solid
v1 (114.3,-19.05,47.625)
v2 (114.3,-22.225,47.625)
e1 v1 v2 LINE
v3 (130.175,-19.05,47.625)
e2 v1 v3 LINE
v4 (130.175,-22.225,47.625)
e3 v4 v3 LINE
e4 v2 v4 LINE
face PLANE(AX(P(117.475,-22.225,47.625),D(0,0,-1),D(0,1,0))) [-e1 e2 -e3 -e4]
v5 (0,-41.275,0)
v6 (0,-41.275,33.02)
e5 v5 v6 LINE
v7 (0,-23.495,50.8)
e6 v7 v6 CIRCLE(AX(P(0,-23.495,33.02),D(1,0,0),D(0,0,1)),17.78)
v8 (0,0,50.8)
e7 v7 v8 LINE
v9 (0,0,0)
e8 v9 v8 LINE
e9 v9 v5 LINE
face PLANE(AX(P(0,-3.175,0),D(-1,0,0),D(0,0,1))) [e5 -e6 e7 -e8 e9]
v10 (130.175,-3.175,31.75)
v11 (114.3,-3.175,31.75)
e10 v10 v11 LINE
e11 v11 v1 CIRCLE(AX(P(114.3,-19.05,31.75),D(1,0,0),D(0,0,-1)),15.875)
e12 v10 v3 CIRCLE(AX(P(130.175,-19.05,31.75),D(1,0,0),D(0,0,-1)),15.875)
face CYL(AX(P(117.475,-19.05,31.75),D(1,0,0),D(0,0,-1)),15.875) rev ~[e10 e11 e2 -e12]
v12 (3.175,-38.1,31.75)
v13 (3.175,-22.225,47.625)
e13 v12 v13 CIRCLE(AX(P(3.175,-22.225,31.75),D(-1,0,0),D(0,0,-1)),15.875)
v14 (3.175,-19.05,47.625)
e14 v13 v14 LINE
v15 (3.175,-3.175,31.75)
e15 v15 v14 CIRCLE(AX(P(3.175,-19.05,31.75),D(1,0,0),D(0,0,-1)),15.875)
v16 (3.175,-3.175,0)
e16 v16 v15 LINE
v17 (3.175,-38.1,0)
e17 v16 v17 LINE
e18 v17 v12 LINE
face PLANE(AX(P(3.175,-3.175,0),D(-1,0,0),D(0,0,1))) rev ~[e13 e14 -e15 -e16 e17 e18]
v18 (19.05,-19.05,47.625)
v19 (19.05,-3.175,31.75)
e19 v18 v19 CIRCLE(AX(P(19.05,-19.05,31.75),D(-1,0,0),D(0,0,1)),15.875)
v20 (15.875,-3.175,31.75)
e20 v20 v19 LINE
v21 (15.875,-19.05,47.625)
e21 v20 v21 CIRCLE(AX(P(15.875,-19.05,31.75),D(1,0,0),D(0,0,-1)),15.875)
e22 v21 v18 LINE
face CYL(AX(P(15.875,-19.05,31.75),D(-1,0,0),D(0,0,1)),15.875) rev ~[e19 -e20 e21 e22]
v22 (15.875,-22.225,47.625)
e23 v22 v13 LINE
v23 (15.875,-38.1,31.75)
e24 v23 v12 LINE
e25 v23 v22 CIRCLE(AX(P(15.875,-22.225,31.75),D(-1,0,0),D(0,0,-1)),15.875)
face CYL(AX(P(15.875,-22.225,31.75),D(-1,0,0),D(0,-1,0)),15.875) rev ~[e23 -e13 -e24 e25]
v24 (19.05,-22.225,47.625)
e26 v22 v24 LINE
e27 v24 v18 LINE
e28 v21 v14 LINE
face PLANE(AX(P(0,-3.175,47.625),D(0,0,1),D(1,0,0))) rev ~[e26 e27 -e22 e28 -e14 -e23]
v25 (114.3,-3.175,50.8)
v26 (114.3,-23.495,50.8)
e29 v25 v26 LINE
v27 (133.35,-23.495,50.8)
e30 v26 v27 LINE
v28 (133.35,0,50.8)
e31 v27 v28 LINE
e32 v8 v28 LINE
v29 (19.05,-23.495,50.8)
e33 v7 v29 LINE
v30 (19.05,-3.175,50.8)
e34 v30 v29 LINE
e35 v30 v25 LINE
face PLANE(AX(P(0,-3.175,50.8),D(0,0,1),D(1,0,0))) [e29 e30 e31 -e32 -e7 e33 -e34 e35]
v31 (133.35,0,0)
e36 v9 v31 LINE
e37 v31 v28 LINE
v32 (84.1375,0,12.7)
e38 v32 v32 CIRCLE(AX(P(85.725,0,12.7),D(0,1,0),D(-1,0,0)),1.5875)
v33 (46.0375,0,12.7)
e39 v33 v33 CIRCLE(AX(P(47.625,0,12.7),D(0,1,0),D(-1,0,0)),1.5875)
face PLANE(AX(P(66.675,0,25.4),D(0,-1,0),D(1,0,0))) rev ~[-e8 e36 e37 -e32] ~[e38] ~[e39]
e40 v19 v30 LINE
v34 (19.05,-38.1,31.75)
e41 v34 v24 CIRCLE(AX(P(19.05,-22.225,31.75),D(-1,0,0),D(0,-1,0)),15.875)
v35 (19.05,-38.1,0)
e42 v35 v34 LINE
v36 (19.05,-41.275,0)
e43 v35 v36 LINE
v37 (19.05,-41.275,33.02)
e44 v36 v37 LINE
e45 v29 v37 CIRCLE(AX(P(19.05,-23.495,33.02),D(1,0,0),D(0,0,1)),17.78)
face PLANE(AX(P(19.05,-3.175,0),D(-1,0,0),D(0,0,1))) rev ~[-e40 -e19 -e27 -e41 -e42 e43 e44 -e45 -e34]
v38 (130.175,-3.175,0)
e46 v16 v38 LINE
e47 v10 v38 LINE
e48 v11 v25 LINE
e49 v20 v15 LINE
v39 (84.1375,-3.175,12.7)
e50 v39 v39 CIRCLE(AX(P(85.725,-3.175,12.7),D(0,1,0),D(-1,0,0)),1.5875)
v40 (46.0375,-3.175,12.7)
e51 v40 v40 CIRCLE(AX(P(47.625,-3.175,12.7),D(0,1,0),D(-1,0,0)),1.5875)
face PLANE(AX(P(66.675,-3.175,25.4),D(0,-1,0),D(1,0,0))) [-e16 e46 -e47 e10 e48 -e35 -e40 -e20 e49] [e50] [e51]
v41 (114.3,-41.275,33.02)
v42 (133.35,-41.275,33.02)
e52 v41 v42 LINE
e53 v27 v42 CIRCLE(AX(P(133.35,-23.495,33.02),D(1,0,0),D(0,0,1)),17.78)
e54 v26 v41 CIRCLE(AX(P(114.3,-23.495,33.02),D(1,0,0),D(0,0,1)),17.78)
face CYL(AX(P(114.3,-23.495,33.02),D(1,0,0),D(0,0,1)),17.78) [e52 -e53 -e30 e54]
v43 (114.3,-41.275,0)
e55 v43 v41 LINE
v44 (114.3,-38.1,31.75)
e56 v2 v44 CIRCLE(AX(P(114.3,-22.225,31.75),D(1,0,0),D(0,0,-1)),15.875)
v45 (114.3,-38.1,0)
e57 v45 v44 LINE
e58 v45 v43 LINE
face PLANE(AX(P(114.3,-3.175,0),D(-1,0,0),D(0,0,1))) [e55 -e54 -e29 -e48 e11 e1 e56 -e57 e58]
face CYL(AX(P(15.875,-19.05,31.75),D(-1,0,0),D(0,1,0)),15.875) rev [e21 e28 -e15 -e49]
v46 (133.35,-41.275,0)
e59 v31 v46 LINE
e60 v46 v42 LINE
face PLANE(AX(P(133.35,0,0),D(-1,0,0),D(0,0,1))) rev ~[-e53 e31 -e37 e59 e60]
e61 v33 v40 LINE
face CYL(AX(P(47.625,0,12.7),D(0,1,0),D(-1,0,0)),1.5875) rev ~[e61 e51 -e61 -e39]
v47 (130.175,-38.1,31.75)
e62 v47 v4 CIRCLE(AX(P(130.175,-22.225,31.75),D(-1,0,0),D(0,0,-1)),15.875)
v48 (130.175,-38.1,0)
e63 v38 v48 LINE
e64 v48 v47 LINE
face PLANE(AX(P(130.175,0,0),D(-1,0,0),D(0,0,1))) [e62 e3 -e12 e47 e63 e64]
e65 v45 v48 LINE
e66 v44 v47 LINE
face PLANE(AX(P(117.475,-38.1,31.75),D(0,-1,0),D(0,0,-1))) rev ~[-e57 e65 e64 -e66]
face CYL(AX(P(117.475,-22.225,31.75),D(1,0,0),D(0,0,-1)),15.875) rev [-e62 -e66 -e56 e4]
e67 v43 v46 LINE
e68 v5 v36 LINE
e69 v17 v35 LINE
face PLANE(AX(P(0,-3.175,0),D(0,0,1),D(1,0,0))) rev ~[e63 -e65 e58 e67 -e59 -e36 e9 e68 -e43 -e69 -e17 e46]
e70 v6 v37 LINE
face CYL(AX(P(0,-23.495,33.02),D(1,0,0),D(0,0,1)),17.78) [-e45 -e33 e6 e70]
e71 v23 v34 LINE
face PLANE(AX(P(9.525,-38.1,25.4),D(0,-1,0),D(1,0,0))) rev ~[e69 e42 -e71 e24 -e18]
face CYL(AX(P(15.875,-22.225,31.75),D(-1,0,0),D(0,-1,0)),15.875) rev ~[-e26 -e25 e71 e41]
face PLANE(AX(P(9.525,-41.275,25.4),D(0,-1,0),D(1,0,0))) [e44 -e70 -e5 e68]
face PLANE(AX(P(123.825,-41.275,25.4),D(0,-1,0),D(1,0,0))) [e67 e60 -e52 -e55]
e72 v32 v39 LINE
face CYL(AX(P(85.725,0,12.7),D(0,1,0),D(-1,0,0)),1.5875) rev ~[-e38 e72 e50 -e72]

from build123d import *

# Parameters (mm, degrees)
F0_W        = 133.35
F0_H        = 50.8
F1_DEPTH    = 3.175
F2_W        = 19.05
F2_H        = 50.8
F3_DEPTH    = 38.1
F4_T        = 3.175
F4_T3_DEPTH = 57.15
F5_R        = 15.875
F7_DEPTH    = 25.4
F8_DEPTH    = 25.4
F9_R        = 1.5875
F10_DEPTH   = 25.4
F11_R       = 17.78


# Not quite as in the source:
# - a shell that OpenCascade refuses in one call is made with other operations: the cavity is built on its own and cut out


with BuildPart() as f1:
    # F0 (on Front) → F1 (new body)
    with BuildSketch(Plane.XZ):
        with Locations((66.675, 25.4)):
            Rectangle(F0_W, F0_H)
    extrude(amount=F1_DEPTH)

    # F2 (on face) → F3 (join)
    with BuildSketch(Plane.XZ.offset(3.175)):
        with Locations((9.525, 25.4)):
            Rectangle(F2_W, F2_H)
        with Locations((123.825, 25.4)):
            Rectangle(F2_W, F2_H)
    extrude(amount=F3_DEPTH)

    # F4: shell of thickness 3.175, made by hand


with BuildPart() as f4_core1:
    # F4_t2: copy of F1
    add(f1.part)

    # the walls: a layer under each face that stays
    f4_faces = [f4_core1.faces().sort_by_distance(p)[0] for p in [
        (0, -20.6375, 25.4),
        (66.675, 0, 25.4),
        (133.35, -20.6375, 25.4),
        (123.825, -41.275, 25.4),
        (114.3, -22.225, 25.4),
        (66.675, -3.175, 25.4),
        (19.05, -22.225, 25.4),
        (9.525, -41.275, 25.4),
        (123.825, -38.3267857143, 50.8),
    ]]
    thicken(f4_faces, amount=-F4_T, mode=Mode.SUBTRACT)

    # F4_s4 → F4_t3 (cut)
    with BuildSketch(Plane.XY.offset(-3.175)):
        Polygon((114.26825, -3.20675), (117.475, -3.175), (117.475, 0), (114.3, 0), align=None)
        Polygon((19.08175, -3.20675), (19.05, 0), (15.875, 0), (15.875, -3.175), align=None)
    extrude(amount=F4_T3_DEPTH, mode=Mode.SUBTRACT)


with BuildPart() as f1_1:
    add(f1.part)

    # what is left inside the walls is the cavity
    f4_cavity = [f4_core1.part.solids().sort_by_distance(p)[0] for p in [
        (3.20675, -26.458333, 23.8125),
        (130.14325, -26.458333, 23.8125),
    ]]
    add(f4_cavity, mode=Mode.SUBTRACT)

    # F5
    f5_edges = [f1_1.edges().sort_by_distance(p)[0] for p in [
        (9.525, -3.175, 47.625),
        (123.825, -3.175, 47.625),
        (9.525, -38.1, 47.625),
        (123.825, -38.1, 47.625),
    ]]
    fillet(f5_edges, radius=F5_R)

    # F6 (on face) → F7 (cut)
    with BuildSketch(Plane(origin=(15.875, 0, 0), x_dir=(0, -1, 0), z_dir=(-1, 0, 0))):
        with BuildLine():
            ThreePointArc((19.05, 47.625), (7.8246798487, 42.9753201513), (3.175, 31.75))
            Line((3.175, 31.75), (3.175, 0))
            Line((3.175, 0), (38.1, 0))
            Line((38.1, 0), (38.1, 31.75))
            ThreePointArc((38.1, 31.75), (33.4503201513, 42.9753201513), (22.225, 47.625))
            Line((22.225, 47.625), (19.05, 47.625))
        make_face()
    extrude(amount=-F7_DEPTH, mode=Mode.SUBTRACT)

    # F8 (cut): a face of the model
    f8_faces = [f1_1.faces().sort_by_distance(p)[0] for p in [
        (117.475, -20.6375, 22.4028811498),
    ]]
    extrude(f8_faces, amount=-F8_DEPTH, mode=Mode.SUBTRACT)

    # F9 (on face) → F10 (cut)
    with BuildSketch(Plane(origin=(0, 0, 0), x_dir=(-1, 0, 0), z_dir=(0, 1, 0))):
        with Locations((-47.625, 12.7)):
            Circle(F9_R)
        with Locations((-85.725, 12.7)):
            Circle(F9_R)
    extrude(amount=-F10_DEPTH, mode=Mode.SUBTRACT)

    # F11
    f11_edges = [f1_1.edges().sort_by_distance(p)[0] for p in [
        (9.525, -41.275, 50.8),
        (123.825, -41.275, 50.8),
    ]]
    fillet(f11_edges, radius=F11_R)


solid = f1_1.part
